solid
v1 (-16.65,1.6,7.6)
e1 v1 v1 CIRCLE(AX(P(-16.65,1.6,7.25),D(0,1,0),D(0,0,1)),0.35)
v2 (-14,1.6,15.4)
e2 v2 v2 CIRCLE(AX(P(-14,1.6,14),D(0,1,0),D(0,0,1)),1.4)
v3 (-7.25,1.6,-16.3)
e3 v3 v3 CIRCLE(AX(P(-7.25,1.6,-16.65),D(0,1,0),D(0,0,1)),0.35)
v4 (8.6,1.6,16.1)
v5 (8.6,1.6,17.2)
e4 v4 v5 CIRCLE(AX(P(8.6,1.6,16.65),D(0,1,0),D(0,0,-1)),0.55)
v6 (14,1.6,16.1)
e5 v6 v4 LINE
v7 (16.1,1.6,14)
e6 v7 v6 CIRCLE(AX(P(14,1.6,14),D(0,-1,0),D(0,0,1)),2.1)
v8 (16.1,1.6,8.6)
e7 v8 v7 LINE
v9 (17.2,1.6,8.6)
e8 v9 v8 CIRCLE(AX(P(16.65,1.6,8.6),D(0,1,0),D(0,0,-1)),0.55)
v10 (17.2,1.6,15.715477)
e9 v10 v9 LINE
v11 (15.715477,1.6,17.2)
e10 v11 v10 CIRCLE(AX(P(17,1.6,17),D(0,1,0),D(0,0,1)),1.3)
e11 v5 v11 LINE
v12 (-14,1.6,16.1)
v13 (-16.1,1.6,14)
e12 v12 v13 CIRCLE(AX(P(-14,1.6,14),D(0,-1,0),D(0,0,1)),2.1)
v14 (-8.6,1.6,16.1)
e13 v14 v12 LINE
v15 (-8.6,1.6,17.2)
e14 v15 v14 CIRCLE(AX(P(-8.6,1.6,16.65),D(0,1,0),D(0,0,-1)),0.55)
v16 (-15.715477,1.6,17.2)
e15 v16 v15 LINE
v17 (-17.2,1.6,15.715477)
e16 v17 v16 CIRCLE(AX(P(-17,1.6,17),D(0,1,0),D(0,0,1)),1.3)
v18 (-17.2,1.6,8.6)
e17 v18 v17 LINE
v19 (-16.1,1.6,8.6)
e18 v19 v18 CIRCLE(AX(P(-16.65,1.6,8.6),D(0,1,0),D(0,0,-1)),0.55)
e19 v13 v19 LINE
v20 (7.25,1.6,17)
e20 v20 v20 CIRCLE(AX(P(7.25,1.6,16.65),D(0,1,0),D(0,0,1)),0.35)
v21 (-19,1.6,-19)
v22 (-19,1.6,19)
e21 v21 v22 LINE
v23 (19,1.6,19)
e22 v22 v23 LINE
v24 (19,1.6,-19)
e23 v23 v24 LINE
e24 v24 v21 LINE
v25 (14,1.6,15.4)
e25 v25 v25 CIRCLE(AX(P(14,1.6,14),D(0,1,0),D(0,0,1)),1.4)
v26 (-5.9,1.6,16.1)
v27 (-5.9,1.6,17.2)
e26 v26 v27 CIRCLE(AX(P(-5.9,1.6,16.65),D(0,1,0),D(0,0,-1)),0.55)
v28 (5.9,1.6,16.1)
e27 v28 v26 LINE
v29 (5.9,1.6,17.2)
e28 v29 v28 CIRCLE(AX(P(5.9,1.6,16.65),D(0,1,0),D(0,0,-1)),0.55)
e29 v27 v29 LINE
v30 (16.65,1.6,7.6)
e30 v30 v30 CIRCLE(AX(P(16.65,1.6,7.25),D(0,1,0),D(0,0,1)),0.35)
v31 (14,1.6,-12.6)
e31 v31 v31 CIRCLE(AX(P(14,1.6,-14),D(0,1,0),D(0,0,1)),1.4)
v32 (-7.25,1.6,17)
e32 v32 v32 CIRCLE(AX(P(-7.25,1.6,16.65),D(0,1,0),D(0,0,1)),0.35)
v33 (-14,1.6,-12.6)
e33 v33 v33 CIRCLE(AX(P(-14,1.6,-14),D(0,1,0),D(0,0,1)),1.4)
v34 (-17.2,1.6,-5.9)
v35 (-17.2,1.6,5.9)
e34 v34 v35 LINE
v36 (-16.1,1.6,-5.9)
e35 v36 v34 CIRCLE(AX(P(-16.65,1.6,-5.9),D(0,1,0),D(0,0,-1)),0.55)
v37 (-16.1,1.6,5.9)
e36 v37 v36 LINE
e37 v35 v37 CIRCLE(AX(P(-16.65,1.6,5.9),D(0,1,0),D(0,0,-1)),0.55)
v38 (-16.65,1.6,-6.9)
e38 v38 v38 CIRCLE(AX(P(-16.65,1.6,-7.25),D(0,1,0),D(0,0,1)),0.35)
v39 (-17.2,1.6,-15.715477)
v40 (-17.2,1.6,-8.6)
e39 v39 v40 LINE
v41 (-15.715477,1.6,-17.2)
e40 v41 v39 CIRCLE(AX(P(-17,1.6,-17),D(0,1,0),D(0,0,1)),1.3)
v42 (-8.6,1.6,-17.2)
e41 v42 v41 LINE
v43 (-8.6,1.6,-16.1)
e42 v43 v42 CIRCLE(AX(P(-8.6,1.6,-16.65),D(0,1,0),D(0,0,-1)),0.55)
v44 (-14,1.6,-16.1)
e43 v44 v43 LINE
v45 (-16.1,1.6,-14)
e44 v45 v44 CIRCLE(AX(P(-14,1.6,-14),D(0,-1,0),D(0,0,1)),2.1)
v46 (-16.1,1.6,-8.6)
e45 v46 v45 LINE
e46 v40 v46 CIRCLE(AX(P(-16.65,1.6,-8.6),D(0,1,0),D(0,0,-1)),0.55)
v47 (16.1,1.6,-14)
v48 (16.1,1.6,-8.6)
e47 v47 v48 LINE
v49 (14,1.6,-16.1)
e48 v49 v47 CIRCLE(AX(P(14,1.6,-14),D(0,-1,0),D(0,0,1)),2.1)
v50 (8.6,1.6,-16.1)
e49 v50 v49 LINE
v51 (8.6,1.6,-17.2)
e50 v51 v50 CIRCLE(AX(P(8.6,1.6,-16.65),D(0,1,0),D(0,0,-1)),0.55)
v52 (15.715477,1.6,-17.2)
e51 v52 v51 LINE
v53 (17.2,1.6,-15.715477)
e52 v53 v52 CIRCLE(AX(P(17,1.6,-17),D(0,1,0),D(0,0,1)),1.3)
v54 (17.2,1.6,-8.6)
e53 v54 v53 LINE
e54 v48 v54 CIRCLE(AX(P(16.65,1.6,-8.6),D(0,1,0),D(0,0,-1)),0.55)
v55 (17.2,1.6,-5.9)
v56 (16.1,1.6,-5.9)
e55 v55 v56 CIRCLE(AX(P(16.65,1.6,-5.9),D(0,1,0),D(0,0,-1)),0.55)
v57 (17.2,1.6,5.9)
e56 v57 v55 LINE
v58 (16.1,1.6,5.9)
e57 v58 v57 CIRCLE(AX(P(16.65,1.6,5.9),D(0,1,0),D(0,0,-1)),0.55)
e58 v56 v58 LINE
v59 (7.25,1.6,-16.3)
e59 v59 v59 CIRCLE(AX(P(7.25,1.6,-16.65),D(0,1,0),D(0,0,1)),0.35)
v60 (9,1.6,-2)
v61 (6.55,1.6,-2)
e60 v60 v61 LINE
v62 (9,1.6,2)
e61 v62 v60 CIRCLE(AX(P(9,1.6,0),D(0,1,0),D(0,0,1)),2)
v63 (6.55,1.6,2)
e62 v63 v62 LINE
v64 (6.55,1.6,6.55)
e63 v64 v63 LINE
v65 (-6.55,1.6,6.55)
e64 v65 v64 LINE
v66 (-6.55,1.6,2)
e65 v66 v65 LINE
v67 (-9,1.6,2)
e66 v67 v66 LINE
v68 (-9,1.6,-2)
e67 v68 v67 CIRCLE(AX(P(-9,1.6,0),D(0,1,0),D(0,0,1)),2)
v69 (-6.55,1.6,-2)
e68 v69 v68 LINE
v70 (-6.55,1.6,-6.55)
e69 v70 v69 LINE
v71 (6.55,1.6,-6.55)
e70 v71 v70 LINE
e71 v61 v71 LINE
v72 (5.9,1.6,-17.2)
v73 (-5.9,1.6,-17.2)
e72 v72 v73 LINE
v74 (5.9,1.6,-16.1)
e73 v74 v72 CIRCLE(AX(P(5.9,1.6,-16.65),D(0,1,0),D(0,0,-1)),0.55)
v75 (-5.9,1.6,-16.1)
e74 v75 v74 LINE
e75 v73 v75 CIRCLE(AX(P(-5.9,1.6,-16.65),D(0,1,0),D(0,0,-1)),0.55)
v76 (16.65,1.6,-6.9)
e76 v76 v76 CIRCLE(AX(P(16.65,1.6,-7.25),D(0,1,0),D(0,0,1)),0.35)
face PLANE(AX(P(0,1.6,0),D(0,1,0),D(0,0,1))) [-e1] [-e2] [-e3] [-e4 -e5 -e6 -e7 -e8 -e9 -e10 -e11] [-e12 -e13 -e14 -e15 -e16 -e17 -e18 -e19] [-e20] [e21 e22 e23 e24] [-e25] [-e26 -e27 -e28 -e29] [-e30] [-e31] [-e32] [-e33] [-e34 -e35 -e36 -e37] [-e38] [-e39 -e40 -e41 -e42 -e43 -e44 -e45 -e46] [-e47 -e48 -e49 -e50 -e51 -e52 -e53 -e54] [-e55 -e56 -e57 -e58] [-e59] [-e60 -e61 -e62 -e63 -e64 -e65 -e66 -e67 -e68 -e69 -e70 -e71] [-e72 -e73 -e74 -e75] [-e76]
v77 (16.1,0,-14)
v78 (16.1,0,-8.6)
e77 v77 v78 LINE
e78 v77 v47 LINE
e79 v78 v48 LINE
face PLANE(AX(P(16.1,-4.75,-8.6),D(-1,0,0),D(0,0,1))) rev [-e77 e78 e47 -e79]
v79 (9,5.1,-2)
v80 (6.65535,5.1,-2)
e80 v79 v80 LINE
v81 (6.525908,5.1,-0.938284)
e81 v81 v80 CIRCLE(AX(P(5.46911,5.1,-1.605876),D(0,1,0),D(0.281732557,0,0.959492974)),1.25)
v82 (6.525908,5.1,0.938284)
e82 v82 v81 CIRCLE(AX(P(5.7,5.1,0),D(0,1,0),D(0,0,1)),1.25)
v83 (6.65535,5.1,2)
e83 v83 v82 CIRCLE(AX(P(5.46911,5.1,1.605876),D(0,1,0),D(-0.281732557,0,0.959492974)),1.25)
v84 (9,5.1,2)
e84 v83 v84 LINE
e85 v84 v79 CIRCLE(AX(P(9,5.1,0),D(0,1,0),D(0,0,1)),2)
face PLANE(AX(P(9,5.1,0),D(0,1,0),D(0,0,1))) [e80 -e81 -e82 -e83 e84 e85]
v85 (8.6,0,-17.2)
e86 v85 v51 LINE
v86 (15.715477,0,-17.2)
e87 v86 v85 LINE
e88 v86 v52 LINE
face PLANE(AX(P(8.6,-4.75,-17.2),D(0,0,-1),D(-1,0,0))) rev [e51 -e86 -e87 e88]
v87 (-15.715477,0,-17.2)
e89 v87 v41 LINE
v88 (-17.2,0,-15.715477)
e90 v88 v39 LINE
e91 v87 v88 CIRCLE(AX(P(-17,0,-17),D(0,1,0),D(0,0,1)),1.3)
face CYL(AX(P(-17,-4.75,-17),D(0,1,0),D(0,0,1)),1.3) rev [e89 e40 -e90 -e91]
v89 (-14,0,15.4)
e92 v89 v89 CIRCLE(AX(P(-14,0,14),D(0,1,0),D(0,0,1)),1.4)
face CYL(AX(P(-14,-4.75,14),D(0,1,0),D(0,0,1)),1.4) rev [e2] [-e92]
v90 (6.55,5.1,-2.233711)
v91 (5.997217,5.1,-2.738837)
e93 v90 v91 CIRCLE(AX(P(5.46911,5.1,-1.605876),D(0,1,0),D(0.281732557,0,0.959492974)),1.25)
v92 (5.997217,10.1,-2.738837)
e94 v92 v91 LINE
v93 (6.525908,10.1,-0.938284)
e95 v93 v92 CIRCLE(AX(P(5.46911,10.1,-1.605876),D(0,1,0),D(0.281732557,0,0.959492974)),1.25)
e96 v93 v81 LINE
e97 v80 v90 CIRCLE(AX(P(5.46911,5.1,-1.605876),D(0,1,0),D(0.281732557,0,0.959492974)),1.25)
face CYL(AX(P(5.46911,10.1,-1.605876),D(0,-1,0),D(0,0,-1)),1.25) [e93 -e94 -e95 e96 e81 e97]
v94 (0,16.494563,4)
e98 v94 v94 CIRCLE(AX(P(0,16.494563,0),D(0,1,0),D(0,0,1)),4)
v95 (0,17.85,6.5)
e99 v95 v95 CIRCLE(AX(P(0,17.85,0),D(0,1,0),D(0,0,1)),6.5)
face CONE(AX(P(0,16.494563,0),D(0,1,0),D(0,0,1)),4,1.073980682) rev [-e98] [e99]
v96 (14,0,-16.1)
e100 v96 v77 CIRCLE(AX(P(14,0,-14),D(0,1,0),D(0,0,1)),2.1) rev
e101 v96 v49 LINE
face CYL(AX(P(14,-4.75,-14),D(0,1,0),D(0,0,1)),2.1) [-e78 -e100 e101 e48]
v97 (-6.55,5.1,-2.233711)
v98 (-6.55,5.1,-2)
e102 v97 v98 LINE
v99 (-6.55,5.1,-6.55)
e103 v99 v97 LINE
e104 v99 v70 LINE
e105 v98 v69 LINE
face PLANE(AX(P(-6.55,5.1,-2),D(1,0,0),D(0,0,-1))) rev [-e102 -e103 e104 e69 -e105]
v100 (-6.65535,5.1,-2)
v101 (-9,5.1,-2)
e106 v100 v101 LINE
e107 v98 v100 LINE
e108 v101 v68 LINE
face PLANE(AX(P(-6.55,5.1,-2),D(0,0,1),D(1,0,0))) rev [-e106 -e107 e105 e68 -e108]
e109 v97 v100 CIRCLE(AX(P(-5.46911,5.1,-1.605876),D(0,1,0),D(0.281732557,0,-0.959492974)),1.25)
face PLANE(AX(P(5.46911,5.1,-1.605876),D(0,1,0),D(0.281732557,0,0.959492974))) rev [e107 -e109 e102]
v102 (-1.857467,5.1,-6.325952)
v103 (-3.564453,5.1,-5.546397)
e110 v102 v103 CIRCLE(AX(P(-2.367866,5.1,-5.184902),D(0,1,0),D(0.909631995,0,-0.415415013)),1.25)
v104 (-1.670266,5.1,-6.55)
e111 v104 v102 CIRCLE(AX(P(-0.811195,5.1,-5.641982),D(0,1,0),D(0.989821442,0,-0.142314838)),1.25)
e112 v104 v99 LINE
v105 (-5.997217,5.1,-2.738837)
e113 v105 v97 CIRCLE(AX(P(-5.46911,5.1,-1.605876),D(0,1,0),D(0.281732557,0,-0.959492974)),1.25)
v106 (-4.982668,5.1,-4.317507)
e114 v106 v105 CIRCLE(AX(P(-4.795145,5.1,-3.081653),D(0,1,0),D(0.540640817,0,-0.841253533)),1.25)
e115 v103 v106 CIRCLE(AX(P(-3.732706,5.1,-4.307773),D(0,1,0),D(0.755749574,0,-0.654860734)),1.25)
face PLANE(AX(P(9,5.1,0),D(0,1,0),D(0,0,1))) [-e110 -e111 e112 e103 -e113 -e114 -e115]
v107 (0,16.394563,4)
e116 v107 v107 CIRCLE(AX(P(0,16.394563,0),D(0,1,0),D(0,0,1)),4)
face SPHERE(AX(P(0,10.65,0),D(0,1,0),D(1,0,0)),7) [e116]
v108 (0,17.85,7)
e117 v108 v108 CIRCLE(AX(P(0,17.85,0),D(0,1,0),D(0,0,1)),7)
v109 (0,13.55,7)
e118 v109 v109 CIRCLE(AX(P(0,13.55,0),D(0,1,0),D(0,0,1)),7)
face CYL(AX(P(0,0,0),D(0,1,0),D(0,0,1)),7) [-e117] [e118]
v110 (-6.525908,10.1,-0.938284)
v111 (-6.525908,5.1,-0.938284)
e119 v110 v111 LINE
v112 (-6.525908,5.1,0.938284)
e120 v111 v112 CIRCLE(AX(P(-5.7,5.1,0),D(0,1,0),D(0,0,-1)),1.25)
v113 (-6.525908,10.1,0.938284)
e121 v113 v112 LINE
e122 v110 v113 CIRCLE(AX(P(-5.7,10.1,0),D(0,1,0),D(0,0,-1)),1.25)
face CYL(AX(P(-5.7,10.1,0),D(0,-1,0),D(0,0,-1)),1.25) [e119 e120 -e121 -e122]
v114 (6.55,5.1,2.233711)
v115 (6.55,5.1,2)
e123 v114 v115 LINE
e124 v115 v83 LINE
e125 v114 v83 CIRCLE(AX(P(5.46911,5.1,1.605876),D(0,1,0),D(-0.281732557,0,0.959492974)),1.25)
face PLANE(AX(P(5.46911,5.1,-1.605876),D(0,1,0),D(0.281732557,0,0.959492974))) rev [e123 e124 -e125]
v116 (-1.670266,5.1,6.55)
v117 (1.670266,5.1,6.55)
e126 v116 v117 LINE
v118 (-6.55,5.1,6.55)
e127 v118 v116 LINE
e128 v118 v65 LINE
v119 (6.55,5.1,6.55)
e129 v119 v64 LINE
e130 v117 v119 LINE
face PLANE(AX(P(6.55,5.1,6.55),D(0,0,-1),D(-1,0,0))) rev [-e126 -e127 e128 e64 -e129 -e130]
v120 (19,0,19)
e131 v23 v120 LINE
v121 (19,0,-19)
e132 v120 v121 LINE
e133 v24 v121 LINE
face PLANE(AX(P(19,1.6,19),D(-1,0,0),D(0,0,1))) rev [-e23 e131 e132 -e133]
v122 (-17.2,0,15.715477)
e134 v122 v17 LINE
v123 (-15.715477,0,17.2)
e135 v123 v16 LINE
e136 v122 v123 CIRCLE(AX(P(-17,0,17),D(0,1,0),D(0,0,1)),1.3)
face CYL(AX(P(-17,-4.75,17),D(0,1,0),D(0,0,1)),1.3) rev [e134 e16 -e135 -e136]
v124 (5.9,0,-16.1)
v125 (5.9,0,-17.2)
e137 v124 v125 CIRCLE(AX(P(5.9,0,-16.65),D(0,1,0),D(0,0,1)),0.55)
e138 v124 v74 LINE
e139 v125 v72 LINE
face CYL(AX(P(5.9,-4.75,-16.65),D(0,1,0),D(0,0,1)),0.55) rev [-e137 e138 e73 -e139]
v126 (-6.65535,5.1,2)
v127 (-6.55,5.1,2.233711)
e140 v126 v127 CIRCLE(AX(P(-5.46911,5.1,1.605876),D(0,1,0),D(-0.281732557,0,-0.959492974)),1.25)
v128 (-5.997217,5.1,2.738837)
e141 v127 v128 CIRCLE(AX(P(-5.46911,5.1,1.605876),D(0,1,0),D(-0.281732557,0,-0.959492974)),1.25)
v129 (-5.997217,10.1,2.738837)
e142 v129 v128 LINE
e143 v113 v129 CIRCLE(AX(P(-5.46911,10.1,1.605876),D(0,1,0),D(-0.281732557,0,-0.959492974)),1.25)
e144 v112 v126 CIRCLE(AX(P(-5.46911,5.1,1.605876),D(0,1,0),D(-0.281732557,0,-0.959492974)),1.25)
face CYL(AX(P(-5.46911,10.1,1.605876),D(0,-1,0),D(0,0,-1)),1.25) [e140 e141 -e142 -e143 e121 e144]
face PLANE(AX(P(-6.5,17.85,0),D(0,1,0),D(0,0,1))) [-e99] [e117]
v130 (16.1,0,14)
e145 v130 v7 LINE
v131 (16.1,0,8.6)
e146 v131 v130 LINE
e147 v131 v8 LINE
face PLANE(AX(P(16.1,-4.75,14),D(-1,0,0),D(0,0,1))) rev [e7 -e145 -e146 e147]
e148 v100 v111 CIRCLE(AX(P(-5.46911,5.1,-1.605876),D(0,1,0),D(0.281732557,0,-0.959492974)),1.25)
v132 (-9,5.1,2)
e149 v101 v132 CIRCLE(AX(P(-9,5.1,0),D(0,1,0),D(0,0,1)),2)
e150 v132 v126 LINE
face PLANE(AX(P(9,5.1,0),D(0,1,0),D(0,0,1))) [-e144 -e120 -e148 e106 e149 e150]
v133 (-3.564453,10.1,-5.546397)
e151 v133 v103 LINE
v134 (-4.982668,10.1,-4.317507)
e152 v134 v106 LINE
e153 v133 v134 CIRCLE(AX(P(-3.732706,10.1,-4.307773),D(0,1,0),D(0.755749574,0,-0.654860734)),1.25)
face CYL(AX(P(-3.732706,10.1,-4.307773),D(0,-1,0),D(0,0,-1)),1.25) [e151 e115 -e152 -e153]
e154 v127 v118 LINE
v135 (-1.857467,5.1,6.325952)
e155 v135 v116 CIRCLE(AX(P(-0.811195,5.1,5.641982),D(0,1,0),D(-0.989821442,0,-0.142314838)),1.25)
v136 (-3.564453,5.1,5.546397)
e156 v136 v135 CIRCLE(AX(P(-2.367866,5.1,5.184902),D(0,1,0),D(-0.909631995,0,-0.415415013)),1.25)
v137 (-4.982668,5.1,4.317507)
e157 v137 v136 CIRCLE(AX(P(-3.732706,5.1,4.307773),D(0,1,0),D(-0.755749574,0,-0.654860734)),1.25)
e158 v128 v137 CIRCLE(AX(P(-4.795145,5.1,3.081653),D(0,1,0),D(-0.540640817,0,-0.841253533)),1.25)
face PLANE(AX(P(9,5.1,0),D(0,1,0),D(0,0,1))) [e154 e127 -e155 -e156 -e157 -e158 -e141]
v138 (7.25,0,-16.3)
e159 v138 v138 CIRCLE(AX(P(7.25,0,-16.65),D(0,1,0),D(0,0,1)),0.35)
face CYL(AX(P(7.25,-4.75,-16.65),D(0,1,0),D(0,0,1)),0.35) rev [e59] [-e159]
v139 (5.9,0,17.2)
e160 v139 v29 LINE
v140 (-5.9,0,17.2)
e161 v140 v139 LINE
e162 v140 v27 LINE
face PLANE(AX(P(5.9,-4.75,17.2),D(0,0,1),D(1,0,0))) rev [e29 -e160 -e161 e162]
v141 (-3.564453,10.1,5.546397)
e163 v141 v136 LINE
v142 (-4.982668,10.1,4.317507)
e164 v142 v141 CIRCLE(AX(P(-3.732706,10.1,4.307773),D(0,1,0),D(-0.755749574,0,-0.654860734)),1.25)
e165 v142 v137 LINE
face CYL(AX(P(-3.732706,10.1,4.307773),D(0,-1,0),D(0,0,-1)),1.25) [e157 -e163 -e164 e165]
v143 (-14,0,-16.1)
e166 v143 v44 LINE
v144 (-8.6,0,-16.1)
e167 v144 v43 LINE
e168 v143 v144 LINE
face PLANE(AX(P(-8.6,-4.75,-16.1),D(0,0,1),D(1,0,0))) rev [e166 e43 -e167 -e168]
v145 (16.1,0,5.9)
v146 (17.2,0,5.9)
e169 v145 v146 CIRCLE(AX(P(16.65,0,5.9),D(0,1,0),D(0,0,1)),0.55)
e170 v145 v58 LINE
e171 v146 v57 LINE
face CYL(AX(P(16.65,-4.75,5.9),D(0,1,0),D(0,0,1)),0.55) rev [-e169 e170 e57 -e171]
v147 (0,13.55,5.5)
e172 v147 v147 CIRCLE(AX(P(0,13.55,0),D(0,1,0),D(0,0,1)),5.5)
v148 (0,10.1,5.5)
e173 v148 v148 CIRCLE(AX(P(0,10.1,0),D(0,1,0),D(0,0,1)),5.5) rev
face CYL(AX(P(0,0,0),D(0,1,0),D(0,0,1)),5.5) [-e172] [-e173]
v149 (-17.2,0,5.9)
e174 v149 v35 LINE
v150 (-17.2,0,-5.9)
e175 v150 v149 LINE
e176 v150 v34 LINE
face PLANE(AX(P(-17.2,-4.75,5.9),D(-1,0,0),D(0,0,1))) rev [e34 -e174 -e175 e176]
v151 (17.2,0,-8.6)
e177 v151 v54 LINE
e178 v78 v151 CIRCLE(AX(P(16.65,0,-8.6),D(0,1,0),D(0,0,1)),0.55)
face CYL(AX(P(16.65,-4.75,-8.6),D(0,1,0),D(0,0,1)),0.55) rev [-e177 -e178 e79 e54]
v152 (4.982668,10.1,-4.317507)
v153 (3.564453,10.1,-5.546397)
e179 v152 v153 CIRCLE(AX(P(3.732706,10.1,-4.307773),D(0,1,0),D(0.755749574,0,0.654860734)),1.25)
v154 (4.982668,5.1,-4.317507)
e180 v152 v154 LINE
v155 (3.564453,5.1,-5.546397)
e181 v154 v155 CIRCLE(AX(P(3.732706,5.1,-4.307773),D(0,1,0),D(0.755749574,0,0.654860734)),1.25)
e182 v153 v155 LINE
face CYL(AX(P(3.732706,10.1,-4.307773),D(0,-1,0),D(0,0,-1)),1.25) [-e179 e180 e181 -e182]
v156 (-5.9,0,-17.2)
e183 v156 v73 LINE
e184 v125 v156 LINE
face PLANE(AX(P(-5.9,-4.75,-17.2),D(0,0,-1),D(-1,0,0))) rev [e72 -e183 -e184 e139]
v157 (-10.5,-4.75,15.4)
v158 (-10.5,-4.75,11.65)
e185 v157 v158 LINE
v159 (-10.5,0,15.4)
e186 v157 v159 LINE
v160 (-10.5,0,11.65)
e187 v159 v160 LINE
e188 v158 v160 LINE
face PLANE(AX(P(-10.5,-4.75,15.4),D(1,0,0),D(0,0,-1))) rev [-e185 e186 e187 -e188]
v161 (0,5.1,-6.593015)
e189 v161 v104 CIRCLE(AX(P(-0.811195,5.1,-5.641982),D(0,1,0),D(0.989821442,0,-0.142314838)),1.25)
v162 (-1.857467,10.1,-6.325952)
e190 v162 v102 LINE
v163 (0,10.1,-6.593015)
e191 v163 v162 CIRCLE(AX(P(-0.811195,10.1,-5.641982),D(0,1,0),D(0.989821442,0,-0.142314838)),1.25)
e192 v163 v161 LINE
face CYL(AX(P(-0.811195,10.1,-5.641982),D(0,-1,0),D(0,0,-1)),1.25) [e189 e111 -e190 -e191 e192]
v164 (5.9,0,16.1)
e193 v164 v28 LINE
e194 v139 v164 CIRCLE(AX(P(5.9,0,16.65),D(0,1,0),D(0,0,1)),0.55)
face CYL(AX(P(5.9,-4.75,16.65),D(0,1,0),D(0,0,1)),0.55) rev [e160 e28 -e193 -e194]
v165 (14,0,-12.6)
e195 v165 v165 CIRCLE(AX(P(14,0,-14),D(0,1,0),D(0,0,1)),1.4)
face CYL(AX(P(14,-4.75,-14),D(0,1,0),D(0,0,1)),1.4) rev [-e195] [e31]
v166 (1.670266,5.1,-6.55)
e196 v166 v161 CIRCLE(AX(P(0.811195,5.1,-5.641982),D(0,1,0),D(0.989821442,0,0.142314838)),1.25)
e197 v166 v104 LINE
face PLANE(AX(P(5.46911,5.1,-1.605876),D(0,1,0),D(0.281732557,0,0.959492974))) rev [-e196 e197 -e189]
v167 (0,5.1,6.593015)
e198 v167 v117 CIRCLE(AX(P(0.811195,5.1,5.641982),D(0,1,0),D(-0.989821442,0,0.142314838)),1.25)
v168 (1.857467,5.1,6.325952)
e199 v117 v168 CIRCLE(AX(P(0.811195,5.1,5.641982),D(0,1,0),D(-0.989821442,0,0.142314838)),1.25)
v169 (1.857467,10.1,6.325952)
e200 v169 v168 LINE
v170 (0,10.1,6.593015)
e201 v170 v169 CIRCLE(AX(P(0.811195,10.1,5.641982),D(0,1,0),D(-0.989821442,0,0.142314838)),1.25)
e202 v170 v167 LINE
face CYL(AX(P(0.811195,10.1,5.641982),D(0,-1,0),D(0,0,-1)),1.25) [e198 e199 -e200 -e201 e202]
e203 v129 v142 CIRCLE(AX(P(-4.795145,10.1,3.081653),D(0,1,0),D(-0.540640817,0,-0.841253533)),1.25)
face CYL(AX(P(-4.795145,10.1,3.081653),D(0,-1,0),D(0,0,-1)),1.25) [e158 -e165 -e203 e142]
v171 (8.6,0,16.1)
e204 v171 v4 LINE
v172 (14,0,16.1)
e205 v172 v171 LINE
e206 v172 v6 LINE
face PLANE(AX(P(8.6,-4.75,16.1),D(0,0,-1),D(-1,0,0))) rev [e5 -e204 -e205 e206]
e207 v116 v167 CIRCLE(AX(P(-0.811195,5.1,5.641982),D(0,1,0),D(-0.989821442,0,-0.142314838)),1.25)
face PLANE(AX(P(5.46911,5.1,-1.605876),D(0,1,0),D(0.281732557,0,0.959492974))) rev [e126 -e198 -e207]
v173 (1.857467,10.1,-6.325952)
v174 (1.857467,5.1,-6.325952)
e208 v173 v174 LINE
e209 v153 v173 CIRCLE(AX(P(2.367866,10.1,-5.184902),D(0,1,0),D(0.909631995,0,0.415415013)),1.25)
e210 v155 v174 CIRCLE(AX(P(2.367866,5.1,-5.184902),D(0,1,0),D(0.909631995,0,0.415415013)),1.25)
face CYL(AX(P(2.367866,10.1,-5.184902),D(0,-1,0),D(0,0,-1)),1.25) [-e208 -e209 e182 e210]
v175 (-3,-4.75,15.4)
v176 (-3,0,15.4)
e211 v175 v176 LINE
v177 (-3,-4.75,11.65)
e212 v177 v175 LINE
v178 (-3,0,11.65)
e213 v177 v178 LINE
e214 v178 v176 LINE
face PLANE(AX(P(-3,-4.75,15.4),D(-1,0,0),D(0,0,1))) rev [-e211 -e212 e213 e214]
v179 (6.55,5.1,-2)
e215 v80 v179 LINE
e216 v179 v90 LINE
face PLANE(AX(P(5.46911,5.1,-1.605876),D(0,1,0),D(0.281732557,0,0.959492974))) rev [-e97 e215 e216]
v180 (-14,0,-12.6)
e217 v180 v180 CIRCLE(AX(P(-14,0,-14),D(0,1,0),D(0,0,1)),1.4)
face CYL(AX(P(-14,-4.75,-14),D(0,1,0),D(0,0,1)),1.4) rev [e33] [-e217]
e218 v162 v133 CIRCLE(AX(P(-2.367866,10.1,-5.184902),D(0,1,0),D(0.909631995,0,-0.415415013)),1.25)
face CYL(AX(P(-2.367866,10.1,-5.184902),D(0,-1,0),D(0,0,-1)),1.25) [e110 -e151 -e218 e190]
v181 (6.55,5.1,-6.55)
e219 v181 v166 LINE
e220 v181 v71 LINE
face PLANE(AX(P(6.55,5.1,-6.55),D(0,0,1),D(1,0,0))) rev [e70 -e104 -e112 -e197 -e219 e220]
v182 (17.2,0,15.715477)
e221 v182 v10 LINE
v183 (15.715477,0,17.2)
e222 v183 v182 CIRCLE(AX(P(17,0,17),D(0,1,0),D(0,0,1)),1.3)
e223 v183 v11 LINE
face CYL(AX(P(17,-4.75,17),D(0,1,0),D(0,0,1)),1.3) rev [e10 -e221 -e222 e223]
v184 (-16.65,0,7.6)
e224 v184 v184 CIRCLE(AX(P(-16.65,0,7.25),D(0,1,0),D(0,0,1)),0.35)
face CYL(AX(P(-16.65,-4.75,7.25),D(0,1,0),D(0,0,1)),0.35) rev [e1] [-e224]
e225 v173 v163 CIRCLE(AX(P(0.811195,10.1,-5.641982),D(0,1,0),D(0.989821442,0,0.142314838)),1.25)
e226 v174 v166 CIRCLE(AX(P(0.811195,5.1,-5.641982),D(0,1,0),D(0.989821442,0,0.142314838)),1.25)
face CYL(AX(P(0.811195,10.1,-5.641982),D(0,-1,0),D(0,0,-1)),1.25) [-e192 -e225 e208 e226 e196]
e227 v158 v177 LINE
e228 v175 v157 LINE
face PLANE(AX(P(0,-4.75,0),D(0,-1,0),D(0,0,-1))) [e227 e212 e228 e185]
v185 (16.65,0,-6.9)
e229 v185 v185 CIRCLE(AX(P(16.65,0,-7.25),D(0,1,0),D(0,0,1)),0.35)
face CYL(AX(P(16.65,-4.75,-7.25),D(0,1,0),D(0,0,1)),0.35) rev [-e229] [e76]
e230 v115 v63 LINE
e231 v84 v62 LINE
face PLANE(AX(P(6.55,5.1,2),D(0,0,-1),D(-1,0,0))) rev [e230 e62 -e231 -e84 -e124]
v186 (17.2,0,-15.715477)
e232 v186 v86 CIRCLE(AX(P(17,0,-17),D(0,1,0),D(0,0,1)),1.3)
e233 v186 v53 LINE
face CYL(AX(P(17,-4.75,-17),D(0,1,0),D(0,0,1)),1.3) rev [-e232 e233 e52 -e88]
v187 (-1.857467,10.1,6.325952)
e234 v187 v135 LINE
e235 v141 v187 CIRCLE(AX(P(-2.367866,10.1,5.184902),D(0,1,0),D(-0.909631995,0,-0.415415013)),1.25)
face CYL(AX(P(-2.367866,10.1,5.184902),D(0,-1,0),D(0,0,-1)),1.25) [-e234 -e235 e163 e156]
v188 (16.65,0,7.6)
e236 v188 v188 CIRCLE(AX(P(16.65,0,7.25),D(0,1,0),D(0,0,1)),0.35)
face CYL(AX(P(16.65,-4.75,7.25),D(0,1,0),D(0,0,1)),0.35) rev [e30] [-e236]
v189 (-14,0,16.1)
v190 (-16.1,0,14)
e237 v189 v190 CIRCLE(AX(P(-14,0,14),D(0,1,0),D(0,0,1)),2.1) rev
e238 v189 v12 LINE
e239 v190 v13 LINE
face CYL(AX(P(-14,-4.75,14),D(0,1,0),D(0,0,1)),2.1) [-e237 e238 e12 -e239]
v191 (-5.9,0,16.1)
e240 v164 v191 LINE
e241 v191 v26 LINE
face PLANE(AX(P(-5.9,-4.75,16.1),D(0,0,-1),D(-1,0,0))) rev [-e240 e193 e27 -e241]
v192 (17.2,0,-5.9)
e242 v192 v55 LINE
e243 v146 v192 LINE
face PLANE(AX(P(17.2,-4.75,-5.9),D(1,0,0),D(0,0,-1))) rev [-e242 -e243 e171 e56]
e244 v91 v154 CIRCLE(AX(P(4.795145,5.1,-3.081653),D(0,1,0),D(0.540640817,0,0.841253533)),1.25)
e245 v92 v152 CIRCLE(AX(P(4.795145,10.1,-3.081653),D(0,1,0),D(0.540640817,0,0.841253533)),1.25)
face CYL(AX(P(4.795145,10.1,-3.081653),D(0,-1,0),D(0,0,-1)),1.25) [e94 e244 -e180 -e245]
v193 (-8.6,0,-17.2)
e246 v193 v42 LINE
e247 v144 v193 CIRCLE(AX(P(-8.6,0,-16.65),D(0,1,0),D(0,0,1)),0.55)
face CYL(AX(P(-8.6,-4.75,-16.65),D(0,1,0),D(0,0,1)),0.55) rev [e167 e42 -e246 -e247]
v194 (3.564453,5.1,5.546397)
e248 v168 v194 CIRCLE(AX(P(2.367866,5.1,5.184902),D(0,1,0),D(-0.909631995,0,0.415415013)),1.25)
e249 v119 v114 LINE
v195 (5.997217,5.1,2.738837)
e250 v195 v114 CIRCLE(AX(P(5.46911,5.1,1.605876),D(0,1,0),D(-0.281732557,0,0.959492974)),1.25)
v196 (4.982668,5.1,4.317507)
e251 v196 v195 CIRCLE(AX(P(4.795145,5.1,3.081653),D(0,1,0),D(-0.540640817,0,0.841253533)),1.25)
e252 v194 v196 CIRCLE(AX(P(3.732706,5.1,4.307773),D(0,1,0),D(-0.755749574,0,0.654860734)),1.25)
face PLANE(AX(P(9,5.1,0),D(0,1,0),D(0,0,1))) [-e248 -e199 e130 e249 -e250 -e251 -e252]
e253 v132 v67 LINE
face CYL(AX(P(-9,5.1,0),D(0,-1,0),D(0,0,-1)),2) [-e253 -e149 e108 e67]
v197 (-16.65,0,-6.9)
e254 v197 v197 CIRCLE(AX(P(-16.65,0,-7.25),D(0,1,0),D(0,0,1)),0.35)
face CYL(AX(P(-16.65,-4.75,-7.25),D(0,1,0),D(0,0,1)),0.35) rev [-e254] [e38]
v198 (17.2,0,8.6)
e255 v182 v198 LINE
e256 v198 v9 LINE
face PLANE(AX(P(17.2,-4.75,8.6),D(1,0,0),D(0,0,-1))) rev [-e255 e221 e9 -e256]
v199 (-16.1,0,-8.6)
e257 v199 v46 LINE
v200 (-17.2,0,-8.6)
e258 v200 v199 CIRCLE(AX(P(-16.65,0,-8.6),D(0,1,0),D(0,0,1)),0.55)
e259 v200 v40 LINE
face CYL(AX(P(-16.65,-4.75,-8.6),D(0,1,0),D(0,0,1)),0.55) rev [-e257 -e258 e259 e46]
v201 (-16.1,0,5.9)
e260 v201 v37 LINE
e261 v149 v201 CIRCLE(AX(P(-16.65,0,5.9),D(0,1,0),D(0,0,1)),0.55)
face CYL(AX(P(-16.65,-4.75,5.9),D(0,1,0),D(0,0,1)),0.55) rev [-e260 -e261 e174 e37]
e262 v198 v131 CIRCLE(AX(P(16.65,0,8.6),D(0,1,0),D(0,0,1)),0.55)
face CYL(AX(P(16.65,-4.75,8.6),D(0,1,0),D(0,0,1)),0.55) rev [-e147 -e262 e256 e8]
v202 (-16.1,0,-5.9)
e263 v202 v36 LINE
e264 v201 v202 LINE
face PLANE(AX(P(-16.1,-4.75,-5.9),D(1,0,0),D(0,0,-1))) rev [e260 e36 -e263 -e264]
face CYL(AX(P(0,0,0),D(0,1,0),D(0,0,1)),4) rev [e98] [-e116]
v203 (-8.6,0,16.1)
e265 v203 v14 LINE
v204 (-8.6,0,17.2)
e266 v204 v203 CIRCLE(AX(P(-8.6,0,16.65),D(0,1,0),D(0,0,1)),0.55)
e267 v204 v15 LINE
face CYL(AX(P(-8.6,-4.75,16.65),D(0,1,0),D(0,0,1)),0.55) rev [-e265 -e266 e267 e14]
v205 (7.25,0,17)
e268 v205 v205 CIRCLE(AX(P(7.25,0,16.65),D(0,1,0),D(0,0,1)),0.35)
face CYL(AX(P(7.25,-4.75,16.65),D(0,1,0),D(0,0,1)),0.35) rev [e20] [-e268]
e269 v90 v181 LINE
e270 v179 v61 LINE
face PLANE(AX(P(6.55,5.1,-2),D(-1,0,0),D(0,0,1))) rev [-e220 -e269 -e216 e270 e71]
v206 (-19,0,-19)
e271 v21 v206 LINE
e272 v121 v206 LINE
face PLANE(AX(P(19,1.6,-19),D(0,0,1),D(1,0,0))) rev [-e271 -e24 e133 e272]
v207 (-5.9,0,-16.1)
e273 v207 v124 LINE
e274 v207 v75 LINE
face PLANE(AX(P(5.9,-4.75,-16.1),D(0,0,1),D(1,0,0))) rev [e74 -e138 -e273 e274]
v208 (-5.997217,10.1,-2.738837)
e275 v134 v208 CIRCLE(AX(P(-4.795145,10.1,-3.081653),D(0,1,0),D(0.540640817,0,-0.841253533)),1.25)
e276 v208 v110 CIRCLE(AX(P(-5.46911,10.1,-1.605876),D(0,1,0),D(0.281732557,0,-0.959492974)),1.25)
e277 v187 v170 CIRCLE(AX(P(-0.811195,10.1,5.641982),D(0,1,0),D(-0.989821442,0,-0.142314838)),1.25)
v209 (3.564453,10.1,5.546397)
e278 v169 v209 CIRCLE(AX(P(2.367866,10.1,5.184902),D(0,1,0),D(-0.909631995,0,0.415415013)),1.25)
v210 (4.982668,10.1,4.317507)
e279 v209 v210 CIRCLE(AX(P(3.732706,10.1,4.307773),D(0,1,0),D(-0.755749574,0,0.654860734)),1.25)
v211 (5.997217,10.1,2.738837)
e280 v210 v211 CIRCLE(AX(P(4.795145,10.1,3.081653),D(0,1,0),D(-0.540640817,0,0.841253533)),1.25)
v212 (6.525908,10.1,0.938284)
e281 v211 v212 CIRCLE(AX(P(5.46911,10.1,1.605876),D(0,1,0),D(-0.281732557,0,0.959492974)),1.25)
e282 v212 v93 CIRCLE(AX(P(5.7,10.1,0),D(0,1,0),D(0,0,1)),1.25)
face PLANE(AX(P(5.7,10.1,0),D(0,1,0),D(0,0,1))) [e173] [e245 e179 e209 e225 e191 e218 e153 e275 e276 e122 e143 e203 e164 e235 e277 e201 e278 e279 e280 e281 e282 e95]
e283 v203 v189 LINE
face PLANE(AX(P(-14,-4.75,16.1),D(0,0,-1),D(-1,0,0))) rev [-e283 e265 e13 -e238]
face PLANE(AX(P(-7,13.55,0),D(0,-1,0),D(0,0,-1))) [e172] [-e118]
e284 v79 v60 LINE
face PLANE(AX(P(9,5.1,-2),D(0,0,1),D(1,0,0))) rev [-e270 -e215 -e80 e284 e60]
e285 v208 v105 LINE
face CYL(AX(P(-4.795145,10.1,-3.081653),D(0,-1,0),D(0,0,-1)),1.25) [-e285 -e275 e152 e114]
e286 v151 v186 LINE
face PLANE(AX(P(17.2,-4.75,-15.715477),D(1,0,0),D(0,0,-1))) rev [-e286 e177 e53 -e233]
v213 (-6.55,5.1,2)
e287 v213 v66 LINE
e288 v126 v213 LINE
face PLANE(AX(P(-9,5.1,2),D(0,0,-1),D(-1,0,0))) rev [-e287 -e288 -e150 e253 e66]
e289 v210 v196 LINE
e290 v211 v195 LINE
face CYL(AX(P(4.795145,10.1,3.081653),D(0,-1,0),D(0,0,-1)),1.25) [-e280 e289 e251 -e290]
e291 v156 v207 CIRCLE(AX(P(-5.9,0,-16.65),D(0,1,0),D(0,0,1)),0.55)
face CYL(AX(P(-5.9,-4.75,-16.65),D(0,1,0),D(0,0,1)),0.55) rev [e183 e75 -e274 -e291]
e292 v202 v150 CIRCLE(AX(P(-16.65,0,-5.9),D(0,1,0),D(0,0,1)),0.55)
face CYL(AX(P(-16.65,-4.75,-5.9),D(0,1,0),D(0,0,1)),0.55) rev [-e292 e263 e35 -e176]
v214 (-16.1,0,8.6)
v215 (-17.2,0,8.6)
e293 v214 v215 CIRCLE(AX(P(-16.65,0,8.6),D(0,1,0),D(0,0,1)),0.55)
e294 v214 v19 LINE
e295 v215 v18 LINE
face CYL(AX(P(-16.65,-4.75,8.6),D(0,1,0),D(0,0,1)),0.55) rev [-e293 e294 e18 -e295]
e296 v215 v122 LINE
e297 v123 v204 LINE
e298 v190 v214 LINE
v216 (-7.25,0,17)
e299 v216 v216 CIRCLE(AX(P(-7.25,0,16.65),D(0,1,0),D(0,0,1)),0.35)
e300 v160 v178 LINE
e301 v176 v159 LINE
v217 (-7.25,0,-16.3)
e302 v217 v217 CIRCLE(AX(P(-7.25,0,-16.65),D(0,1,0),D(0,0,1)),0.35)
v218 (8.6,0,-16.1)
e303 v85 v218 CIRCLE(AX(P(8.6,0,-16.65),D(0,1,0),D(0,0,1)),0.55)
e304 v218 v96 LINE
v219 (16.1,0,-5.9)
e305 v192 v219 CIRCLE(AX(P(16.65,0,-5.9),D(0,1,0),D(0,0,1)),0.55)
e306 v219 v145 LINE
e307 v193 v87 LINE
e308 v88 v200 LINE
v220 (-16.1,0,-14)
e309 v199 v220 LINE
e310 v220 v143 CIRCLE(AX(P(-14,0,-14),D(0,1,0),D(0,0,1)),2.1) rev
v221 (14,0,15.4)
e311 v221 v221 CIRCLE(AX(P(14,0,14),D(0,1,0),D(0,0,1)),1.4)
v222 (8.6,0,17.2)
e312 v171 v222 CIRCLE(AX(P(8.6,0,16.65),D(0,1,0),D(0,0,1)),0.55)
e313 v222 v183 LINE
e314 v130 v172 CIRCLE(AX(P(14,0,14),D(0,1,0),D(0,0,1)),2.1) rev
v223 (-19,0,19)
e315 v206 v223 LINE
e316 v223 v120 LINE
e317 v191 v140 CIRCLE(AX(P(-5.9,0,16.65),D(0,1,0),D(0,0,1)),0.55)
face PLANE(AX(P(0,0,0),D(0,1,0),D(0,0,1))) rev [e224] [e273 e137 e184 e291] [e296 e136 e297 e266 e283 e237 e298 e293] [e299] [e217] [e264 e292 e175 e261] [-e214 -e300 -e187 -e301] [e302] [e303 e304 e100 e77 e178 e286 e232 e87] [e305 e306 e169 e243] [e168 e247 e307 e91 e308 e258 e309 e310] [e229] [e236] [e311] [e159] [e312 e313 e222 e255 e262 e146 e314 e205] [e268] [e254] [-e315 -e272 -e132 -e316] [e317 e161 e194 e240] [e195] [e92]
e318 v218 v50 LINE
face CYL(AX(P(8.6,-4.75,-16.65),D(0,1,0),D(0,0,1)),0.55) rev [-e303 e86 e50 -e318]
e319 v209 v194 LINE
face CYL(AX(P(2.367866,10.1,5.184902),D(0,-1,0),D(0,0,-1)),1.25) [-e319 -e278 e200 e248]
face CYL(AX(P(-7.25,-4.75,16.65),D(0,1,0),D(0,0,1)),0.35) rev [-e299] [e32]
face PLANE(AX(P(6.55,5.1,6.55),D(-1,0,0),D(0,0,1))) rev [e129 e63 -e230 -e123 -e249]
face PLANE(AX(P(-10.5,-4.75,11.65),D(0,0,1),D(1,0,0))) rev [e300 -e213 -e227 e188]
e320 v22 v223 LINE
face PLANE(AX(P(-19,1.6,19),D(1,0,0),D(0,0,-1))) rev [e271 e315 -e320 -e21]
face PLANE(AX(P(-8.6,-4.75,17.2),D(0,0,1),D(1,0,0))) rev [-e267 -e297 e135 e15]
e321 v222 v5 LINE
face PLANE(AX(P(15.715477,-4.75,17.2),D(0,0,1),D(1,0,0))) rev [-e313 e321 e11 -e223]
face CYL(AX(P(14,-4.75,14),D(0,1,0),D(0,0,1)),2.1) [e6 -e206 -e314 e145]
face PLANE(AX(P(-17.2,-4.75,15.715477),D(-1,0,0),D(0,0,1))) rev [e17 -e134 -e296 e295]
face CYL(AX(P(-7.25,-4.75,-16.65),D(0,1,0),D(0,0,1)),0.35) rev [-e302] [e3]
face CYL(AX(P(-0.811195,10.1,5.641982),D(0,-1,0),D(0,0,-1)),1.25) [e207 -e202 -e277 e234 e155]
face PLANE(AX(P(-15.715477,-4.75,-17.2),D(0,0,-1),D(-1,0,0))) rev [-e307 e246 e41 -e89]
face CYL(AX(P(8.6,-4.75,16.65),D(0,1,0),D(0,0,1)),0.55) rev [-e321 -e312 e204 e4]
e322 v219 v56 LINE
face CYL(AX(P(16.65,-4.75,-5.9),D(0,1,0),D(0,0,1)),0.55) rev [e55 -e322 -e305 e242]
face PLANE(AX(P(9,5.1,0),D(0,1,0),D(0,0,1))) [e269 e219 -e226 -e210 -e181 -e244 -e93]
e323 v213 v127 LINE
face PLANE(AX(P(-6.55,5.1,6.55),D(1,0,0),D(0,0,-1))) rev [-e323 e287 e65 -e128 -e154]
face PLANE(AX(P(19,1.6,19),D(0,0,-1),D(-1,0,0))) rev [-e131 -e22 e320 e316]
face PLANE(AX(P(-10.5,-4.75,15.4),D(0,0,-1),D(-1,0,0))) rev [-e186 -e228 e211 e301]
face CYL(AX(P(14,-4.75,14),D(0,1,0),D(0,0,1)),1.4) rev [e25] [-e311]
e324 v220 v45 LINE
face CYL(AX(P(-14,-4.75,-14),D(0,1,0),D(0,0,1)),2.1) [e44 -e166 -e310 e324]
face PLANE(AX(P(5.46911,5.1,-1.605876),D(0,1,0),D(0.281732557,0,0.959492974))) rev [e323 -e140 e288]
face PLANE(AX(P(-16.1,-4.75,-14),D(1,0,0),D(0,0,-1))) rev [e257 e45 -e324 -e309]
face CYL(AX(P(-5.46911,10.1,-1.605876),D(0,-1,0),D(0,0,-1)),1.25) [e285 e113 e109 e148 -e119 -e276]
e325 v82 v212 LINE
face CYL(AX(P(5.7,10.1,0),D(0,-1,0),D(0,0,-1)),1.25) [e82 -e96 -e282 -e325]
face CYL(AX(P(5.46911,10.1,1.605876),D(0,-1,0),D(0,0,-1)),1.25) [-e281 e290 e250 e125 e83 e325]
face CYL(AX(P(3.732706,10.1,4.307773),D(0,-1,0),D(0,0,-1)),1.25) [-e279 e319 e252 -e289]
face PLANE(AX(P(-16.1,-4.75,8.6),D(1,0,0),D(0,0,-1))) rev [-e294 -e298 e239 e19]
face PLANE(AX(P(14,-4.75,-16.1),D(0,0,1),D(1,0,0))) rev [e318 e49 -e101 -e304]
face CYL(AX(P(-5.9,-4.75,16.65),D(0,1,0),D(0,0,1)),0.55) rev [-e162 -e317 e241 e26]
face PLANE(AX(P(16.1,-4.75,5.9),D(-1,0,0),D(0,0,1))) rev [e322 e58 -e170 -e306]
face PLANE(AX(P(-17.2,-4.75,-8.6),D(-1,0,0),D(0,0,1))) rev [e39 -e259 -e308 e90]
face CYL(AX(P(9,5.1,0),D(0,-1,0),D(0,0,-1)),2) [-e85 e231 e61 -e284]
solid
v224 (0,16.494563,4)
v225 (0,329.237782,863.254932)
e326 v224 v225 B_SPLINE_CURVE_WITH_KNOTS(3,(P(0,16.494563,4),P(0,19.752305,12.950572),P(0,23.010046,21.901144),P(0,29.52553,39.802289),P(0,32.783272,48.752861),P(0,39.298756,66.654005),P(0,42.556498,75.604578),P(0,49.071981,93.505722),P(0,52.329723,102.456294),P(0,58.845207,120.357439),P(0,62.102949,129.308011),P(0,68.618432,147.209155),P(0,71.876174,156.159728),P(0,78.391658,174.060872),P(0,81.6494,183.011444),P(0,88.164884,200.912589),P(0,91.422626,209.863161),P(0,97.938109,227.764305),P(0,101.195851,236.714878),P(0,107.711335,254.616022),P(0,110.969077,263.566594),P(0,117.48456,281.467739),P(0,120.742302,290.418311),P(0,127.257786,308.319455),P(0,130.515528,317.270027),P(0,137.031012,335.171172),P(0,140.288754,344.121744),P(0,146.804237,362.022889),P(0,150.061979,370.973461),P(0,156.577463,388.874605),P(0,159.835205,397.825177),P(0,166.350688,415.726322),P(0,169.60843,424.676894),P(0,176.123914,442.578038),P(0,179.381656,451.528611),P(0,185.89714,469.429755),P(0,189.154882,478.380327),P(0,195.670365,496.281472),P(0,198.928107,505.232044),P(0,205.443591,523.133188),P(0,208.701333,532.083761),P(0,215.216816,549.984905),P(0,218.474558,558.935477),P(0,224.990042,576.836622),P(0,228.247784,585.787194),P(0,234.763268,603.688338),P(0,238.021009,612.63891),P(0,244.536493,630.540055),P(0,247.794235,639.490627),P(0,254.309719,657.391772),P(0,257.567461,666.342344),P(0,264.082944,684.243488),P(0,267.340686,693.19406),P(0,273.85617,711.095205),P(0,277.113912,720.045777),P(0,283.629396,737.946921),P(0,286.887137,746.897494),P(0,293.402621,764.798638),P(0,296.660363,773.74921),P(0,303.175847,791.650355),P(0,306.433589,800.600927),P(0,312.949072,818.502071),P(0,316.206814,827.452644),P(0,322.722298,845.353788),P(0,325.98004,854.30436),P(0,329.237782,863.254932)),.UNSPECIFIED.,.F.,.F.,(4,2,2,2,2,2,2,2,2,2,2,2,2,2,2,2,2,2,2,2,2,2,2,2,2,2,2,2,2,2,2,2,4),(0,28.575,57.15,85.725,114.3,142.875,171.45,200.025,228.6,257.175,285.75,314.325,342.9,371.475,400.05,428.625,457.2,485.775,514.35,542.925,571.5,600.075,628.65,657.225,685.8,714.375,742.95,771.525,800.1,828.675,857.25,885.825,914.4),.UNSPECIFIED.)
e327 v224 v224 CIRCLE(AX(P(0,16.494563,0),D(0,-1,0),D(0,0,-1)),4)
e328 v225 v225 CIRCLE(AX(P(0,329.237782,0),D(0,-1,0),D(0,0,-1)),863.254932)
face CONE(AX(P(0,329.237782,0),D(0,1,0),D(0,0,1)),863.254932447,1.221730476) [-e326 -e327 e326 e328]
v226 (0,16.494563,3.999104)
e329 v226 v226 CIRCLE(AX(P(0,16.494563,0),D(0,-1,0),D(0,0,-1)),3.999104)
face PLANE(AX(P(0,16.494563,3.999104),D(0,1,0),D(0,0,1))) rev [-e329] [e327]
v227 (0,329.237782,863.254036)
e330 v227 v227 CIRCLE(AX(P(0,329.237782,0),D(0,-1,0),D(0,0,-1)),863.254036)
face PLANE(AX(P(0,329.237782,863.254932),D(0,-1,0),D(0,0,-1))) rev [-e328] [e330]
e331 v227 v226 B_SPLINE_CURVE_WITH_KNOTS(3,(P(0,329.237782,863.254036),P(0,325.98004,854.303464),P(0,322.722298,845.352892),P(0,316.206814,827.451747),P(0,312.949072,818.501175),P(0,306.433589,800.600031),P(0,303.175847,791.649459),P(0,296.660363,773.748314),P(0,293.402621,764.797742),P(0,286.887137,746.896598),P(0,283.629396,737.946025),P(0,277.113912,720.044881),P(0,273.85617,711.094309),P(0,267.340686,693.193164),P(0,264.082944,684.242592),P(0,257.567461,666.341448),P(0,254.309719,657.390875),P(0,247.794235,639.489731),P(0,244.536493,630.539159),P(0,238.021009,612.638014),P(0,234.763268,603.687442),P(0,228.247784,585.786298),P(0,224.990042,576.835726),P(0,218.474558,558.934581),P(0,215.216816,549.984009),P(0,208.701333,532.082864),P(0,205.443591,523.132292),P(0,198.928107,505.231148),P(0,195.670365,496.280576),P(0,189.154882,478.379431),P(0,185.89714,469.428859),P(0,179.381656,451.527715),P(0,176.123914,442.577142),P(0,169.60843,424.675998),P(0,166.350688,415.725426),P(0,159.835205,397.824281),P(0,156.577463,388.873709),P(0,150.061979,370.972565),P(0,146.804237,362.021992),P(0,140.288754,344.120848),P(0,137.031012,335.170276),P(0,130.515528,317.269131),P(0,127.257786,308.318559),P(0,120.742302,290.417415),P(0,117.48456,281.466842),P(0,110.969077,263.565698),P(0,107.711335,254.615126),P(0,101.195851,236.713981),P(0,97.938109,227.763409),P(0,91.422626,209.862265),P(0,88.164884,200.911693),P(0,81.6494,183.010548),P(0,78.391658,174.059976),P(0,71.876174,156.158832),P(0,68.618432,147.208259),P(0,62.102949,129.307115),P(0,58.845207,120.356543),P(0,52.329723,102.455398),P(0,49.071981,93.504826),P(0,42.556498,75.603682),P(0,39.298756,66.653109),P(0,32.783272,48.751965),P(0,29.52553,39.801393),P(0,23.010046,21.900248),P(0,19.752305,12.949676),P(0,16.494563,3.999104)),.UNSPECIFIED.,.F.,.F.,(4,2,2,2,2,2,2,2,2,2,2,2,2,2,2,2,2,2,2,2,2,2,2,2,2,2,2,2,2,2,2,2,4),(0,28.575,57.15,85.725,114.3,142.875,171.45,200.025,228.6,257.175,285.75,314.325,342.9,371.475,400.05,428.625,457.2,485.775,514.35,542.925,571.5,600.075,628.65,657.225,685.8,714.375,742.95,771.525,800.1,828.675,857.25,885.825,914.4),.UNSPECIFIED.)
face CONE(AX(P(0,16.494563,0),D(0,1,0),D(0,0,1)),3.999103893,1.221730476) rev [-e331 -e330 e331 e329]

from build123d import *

# Parameters (mm, degrees)
SKETCH1_W           = 38
SKETCH1_H           = 38
BOSS_EXTRUDE1_DEPTH = 1.6
BOSS_EXTRUDE2_DEPTH = 3.5
SKETCH3_R           = 1.25
BOSS_EXTRUDE3_DEPTH = 5
CIRPATTERN1_COUNT   = 22
SKETCH5_W           = 7.5
SKETCH5_H           = 3.75
BOSS_EXTRUDE4_DEPTH = 4.75
SKETCH6_R           = 1.4
SKETCH6_R_2         = 0.35
CUT_EXTRUDE1_DEPTH  = 32.401632123


# Read off the part's stored shape, not the designer's step: FOV
with BuildPart() as part:
    # Sketch1 → Boss-Extrude1 (new body)
    with BuildSketch(Plane(origin=(0, 0, 0), x_dir=(1, 0, 0), z_dir=(0, 1, 0))):
        Rectangle(SKETCH1_W, SKETCH1_H)
    extrude(amount=BOSS_EXTRUDE1_DEPTH)

    # Sketch2 → Boss-Extrude2 (add)
    with BuildSketch(Plane(origin=(0, 1.6, 0), x_dir=(1, 0, 0), z_dir=(0, 1, 0))):
        with BuildLine():
            Line((-6.55, 2), (-9, 2))
            ThreePointArc((-9, 2), (-11, 0), (-9, -2))
            Line((-9, -2), (-6.55, -2))
            Line((-6.55, -2), (-6.55, -6.55))
            Line((-6.55, -6.55), (6.55, -6.55))
            Line((6.55, -6.55), (6.55, -2))
            Line((6.55, -2), (9, -2))
            ThreePointArc((9, -2), (11, 0), (9, 2))
            Line((9, 2), (6.55, 2))
            Line((6.55, 2), (6.55, 6.55))
            Line((6.55, 6.55), (-6.55, 6.55))
            Line((-6.55, 6.55), (-6.55, 2))
        make_face()
    extrude(amount=BOSS_EXTRUDE2_DEPTH)

    # Sketch4 → Revolve1 (revolve)
    with BuildSketch(Plane.XY, mode=Mode.PRIVATE) as revolve1_sk:
        with BuildLine():
            Line((0, 0), (0, 17.65))
            ThreePointArc((0, 17.65), (-2.096194346, 17.328770041), (-4, 16.394562647))
            Line((-4, 16.394562647), (-4, 16.494562647))
            Line((-4, 16.494562647), (-6.5, 17.85))
            Line((-6.5, 17.85), (-7, 17.85))
            Line((-7, 17.85), (-7, 13.55))
            Line((-7, 13.55), (-5.5, 13.55))
            Line((-5.5, 13.55), (-5.5, 0))
            Line((-5.5, 0), (0, 0))
        make_face()
    revolve(revolve1_sk.sketch.rotate(Axis((0, 0, 0), (0, -1, 0)), 270), axis=Axis((0, 0, 0), (0, -1, 0)))

    # Sketch3 → Boss-Extrude3 (add)
    with BuildSketch(Plane(origin=(0, 5.1, 0), x_dir=(1, 0, 0), z_dir=(0, 1, 0))):
        with Locations((5.7, 0)):
            Circle(SKETCH3_R)
    boss_extrude3 = extrude(amount=BOSS_EXTRUDE3_DEPTH)

    # CirPattern1: Boss-Extrude3 ×22 about axis
    cirpattern1_axis = Axis((0, 0, 0), (0, 1, 0))
    for i in range(1, CIRPATTERN1_COUNT):
        add(boss_extrude3.rotate(cirpattern1_axis, i * 360 / CIRPATTERN1_COUNT))

    # Sketch5 → Boss-Extrude4 (add)
    with BuildSketch(Plane.XZ):
        with Locations((-6.75, 13.525)):
            Rectangle(SKETCH5_W, SKETCH5_H)
    extrude(amount=BOSS_EXTRUDE4_DEPTH)

    # Sketch6 → Cut-Extrude1 (cut, through all)
    with BuildSketch(Plane(origin=(0, 1.6, 0), x_dir=(1, 0, 0), z_dir=(0, 1, 0))):
        with Locations(Location((-14, 14, 0), (0, 0, 270))):
            Circle(SKETCH6_R)
        with Locations(Location((-7.25, 16.65, 0), (0, 0, 270))):
            Circle(SKETCH6_R_2)
        with Locations(Location((7.25, 16.65, 0), (0, 0, 270))):
            Circle(SKETCH6_R_2)
        with Locations(Location((14, 14, 0), (0, 0, 270))):
            Circle(SKETCH6_R)
        with Locations(Location((16.65, 7.25, 0), (0, 0, 270))):
            Circle(SKETCH6_R_2)
        with Locations(Location((16.65, -7.25, 0), (0, 0, 270))):
            Circle(SKETCH6_R_2)
        with Locations(Location((14, -14, 0), (0, 0, 270))):
            Circle(SKETCH6_R)
        with Locations(Location((7.25, -16.65, 0), (0, 0, 270))):
            Circle(SKETCH6_R_2)
        with Locations(Location((-7.25, -16.65, 0), (0, 0, 270))):
            Circle(SKETCH6_R_2)
        with Locations(Location((-14, -14, 0), (0, 0, 270))):
            Circle(SKETCH6_R)
        with Locations(Location((-16.65, -7.25, 0), (0, 0, 270))):
            Circle(SKETCH6_R_2)
        with Locations(Location((-16.65, 7.25, 0), (0, 0, 270))):
            Circle(SKETCH6_R_2)
        with BuildLine():
            Line((-15.715476742, 17.2), (-8.6, 17.2))
            ThreePointArc((-8.6, 17.2), (-8.05, 16.65), (-8.6, 16.1))
            Line((-8.6, 16.1), (-14, 16.1))
            ThreePointArc((-14, 16.1), (-15.48492424, 15.48492424), (-16.1, 14))
            Line((-16.1, 14), (-16.1, 8.6))
            ThreePointArc((-16.1, 8.6), (-16.65, 8.05), (-17.2, 8.6))
            Line((-17.2, 8.6), (-17.2, 15.715476742))
            ThreePointArc((-17.2, 15.715476742), (-17.919238816, 17.919238816), (-15.715476742, 17.2))
        make_face()
        with BuildLine():
            Line((-5.9, 17.2), (5.9, 17.2))
            ThreePointArc((5.9, 17.2), (6.45, 16.65), (5.9, 16.1))
            Line((5.9, 16.1), (-5.9, 16.1))
            ThreePointArc((-5.9, 16.1), (-6.45, 16.65), (-5.9, 17.2))
        make_face()
        with BuildLine():
            Line((14, 16.1), (8.6, 16.1))
            ThreePointArc((8.6, 16.1), (8.05, 16.65), (8.6, 17.2))
            Line((8.6, 17.2), (15.715476742, 17.2))
            ThreePointArc((15.715476742, 17.2), (17.919238816, 17.919238816), (17.2, 15.715476742))
            Line((17.2, 15.715476742), (17.2, 8.6))
            ThreePointArc((17.2, 8.6), (16.65, 8.05), (16.1, 8.6))
            Line((16.1, 8.6), (16.1, 14))
            ThreePointArc((16.1, 14), (15.48492424, 15.48492424), (14, 16.1))
        make_face()
        with BuildLine():
            Line((16.1, -5.9), (16.1, 5.9))
            ThreePointArc((16.1, 5.9), (16.65, 6.45), (17.2, 5.9))
            Line((17.2, 5.9), (17.2, -5.9))
            ThreePointArc((17.2, -5.9), (16.65, -6.45), (16.1, -5.9))
        make_face()
        with BuildLine():
            Line((16.1, -14), (16.1, -8.6))
            ThreePointArc((16.1, -8.6), (16.65, -8.05), (17.2, -8.6))
            Line((17.2, -8.6), (17.2, -15.715476742))
            ThreePointArc((17.2, -15.715476742), (17.919238816, -17.919238816), (15.715476742, -17.2))
            Line((15.715476742, -17.2), (8.6, -17.2))
            ThreePointArc((8.6, -17.2), (8.05, -16.65), (8.6, -16.1))
            Line((8.6, -16.1), (14, -16.1))
            ThreePointArc((14, -16.1), (15.48492424, -15.48492424), (16.1, -14))
        make_face()
        with BuildLine():
            Line((-5.9, -16.1), (5.9, -16.1))
            ThreePointArc((5.9, -16.1), (6.45, -16.65), (5.9, -17.2))
            Line((5.9, -17.2), (-5.9, -17.2))
            ThreePointArc((-5.9, -17.2), (-6.45, -16.65), (-5.9, -16.1))
        make_face()
        with BuildLine():
            Line((-14, -16.1), (-8.6, -16.1))
            ThreePointArc((-8.6, -16.1), (-8.05, -16.65), (-8.6, -17.2))
            Line((-8.6, -17.2), (-15.715476742, -17.2))
            ThreePointArc((-15.715476742, -17.2), (-17.919238816, -17.919238816), (-17.2, -15.715476742))
            Line((-17.2, -15.715476742), (-17.2, -8.6))
            ThreePointArc((-17.2, -8.6), (-16.65, -8.05), (-16.1, -8.6))
            Line((-16.1, -8.6), (-16.1, -14))
            ThreePointArc((-16.1, -14), (-15.48492424, -15.48492424), (-14, -16.1))
        make_face()
        with BuildLine():
            Line((-16.1, 5.9), (-16.1, -5.9))
            ThreePointArc((-16.1, -5.9), (-16.65, -6.45), (-17.2, -5.9))
            Line((-17.2, -5.9), (-17.2, 5.9))
            ThreePointArc((-17.2, 5.9), (-16.65, 6.45), (-16.1, 5.9))
        make_face()
    extrude(amount=-CUT_EXTRUDE1_DEPTH, mode=Mode.SUBTRACT)


with BuildPart() as body_2:
    # FOV outline → FOV (revolve)
    with BuildSketch(Plane.XY):
        Polygon((863.25403634, 329.237781704), (3.999103893, 16.494562647), (4, 16.494562647), (863.254932447, 329.237781704), align=None)
    revolve(axis=Axis((0, 0, 0), (0, 1, 0)))


solid = Compound([part.part, body_2.part])
